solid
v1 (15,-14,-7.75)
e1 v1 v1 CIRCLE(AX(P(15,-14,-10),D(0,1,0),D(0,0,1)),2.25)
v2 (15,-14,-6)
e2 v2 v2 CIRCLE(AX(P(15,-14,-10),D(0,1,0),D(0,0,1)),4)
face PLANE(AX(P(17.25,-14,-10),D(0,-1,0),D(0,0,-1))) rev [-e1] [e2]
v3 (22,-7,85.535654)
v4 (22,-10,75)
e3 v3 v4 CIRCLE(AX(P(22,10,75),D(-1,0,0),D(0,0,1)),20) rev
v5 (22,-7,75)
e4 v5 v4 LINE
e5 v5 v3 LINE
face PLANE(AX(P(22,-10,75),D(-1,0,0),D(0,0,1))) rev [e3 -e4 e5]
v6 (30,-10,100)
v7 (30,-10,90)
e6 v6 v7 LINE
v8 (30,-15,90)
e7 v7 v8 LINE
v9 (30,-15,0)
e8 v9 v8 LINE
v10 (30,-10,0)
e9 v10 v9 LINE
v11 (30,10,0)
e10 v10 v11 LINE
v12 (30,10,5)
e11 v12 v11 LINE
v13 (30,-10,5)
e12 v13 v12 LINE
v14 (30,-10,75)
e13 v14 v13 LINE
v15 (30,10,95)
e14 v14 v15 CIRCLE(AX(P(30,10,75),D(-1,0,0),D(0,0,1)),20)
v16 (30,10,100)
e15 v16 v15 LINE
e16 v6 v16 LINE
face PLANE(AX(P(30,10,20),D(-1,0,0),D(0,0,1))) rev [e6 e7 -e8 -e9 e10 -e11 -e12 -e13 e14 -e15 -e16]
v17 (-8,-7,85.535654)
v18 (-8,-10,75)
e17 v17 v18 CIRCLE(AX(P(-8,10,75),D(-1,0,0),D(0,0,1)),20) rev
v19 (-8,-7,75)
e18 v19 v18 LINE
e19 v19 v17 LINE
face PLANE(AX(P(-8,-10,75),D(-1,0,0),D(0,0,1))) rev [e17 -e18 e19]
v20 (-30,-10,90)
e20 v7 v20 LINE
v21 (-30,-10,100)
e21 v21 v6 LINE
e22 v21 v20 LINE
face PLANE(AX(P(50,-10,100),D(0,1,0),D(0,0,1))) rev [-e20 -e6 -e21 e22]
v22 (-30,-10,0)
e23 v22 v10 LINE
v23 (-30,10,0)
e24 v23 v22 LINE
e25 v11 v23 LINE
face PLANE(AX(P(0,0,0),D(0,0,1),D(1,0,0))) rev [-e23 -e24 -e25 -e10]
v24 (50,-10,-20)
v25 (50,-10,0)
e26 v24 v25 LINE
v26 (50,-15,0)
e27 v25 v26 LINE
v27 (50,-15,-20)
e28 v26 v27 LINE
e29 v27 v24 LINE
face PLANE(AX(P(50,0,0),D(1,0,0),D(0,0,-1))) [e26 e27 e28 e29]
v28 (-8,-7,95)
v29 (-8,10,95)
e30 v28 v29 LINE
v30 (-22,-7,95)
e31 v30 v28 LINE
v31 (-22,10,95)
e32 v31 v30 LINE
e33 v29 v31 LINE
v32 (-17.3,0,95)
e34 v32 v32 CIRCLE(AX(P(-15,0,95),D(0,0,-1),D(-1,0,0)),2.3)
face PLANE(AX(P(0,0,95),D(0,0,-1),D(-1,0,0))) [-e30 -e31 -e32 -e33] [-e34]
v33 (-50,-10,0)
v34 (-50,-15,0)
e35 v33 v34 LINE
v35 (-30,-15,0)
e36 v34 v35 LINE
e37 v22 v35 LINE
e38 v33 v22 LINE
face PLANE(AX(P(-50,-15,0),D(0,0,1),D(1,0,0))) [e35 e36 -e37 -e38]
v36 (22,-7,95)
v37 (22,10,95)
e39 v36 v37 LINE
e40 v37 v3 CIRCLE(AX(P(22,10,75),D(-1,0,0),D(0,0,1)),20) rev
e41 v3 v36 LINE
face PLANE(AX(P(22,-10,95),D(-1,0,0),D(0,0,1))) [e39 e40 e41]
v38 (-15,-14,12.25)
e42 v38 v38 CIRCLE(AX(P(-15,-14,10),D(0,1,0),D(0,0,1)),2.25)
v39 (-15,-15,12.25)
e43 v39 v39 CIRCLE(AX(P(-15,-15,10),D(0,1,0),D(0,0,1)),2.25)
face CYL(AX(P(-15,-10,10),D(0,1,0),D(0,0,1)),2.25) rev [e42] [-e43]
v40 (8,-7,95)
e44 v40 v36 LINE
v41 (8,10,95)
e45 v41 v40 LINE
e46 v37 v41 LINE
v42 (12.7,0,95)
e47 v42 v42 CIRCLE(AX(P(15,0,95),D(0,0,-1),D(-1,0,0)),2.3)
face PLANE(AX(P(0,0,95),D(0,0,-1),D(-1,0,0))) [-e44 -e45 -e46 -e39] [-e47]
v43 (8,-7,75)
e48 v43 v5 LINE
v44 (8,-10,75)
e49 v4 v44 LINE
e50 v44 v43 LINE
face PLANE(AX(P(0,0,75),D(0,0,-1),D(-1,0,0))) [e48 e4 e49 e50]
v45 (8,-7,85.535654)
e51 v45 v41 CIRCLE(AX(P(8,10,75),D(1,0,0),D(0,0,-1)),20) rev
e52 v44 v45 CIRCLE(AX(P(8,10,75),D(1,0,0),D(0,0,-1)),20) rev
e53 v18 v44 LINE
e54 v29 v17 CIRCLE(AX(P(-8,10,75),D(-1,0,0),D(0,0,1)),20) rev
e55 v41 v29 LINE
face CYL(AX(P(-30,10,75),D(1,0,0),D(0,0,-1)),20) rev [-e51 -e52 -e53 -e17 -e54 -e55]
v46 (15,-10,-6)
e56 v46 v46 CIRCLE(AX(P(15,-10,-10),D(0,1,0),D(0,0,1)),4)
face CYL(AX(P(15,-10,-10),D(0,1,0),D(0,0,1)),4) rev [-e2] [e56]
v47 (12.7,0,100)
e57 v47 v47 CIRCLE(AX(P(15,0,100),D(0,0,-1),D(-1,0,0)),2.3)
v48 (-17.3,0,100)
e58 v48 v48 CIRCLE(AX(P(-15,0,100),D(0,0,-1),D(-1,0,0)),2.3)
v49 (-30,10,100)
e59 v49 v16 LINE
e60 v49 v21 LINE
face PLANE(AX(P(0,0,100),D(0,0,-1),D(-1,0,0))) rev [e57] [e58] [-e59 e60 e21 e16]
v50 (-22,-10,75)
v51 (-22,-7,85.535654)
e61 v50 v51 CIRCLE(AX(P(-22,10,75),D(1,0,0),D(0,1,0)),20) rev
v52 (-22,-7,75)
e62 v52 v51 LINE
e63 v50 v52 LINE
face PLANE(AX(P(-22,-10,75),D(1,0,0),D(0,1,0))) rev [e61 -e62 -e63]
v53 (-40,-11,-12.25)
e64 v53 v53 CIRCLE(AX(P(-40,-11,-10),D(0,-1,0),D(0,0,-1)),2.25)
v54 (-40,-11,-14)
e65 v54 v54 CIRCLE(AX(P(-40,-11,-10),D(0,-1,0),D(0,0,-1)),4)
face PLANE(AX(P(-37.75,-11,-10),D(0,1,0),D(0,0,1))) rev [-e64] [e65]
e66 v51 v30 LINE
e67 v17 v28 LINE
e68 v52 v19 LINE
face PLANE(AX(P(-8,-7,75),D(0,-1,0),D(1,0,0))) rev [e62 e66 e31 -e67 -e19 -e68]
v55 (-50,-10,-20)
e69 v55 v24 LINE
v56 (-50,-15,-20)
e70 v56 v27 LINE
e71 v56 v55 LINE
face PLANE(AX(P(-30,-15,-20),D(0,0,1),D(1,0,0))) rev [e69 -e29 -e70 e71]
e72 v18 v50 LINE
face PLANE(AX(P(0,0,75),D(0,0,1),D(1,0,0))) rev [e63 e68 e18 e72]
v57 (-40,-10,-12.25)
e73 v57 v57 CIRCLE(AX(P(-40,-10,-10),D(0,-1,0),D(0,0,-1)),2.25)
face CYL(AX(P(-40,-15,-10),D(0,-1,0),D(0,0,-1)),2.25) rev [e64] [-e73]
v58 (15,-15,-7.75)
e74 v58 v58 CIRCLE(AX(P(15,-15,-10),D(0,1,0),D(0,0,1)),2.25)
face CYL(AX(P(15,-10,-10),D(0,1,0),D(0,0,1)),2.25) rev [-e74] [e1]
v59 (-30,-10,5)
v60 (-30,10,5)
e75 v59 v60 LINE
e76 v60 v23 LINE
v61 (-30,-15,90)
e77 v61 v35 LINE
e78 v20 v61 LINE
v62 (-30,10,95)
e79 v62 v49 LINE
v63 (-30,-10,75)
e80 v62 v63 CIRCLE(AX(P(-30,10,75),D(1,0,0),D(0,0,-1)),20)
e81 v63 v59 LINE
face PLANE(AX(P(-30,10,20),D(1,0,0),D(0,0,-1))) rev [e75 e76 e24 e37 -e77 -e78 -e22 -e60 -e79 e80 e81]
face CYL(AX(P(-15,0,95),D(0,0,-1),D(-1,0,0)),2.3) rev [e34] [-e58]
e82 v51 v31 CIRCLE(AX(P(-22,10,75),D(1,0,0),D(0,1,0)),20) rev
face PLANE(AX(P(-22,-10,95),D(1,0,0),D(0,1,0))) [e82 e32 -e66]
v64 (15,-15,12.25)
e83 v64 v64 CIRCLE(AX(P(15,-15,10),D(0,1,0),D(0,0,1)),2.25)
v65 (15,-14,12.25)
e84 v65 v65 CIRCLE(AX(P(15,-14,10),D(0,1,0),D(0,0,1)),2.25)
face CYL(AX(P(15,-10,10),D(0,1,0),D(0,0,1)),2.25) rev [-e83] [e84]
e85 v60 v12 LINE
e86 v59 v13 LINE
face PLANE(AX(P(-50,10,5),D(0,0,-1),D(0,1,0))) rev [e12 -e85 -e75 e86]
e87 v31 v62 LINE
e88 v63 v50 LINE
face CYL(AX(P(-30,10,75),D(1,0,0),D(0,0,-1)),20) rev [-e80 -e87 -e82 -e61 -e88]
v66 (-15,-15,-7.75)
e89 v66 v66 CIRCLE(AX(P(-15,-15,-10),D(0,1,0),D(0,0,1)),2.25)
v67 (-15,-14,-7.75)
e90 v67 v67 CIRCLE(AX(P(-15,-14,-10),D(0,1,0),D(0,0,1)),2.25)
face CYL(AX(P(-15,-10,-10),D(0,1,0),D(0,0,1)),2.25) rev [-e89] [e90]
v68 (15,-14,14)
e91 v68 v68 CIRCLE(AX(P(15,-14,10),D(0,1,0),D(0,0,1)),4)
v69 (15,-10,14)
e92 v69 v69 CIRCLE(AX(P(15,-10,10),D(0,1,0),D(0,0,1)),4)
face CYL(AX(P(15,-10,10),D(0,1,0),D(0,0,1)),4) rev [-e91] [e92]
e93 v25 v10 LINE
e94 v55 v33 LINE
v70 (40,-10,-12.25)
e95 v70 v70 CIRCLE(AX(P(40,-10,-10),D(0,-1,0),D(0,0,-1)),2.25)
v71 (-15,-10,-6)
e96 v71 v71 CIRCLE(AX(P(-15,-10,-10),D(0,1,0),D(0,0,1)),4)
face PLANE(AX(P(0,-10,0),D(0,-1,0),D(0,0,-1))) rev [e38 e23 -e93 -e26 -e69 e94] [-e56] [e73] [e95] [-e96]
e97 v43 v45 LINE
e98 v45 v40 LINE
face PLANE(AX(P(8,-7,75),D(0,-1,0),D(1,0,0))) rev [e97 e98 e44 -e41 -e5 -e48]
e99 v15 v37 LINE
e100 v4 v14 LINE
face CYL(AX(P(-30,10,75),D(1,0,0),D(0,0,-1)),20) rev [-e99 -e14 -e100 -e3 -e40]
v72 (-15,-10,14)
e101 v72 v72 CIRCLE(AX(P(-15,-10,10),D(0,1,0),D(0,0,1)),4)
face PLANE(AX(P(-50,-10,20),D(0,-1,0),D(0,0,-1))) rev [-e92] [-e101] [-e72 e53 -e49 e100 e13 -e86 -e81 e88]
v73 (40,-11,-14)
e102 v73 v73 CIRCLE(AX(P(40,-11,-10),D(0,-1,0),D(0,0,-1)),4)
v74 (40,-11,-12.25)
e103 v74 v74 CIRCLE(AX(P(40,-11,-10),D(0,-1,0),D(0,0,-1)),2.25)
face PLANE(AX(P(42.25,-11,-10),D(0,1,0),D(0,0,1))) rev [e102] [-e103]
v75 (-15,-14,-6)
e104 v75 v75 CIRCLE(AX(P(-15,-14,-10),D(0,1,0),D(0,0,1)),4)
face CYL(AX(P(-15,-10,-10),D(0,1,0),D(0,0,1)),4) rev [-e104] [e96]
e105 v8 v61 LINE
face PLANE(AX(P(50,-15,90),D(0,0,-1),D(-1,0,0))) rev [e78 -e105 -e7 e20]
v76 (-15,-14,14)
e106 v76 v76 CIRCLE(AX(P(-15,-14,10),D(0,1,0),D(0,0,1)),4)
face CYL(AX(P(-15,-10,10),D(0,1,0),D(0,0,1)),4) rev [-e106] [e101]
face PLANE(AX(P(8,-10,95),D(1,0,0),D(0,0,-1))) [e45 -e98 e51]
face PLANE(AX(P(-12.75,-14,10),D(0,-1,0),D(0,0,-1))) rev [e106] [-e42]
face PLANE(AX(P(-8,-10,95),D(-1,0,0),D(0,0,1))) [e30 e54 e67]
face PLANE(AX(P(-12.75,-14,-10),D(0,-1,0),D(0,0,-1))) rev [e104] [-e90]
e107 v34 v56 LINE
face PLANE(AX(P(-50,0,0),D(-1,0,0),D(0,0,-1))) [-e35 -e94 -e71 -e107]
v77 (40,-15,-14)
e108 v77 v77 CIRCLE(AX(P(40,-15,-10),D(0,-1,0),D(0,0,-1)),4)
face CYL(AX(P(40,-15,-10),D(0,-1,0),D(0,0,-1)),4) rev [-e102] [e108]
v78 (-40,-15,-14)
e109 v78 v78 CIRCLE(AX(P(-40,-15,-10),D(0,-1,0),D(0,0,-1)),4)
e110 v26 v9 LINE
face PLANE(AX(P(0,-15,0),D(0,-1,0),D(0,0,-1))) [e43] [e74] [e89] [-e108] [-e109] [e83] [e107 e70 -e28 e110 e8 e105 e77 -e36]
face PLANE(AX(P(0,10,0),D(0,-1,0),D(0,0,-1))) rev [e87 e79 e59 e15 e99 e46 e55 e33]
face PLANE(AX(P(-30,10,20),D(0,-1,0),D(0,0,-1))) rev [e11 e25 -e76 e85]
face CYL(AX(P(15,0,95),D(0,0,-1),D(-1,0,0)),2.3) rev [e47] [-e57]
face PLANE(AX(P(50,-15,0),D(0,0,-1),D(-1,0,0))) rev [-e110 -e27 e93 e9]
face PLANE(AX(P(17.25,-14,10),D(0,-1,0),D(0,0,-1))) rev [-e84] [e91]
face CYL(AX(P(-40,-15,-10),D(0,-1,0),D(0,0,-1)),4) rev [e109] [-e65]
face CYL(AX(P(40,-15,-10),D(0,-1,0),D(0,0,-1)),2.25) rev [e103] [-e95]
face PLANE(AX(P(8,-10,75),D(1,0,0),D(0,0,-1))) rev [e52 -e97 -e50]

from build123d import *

# Parameters (mm, degrees)
SKETCH_1_W                   = 60
SKETCH_1_H                   = 20
EXTRUDE_1_DEPTH              = 20
SKETCH_2_W                   = 60
SKETCH_2_H                   = 40
EXTRUDE_2_DEPTH              = 5
SKETCH_3_W                   = 20
SKETCH_3_H                   = 5
EXTRUDE_3_DEPTH              = 20
HOLE_WIZARD_M4_2_D           = 4.5
HOLE_WIZARD_M4_2_CBORE_D     = 8
HOLE_WIZARD_M4_2_CBORE_DEPTH = 4
SKETCH_8_W                   = 15
SKETCH_8_H                   = 20
CUT_EXTRUDE_1_DEPTH          = 84.815273071
HOLE_WIZARD_M4_1_D           = 4.5
HOLE_WIZARD_M4_1_CBORE_D     = 8
HOLE_WIZARD_M4_1_CBORE_DEPTH = 4
SKETCH_10_W                  = 60
SKETCH_10_H                  = 5
EXTRUDE_4_DEPTH              = 80
SKETCH_11_W                  = 60
SKETCH_11_H                  = 5
EXTRUDE_5_DEPTH              = 20
FILLET_1_R                   = 20
SKETCH_12_W                  = 10
SKETCH_12_H                  = 5
CUT_EXTRUDE_2_DEPTH          = 129.937969582
SKETCH_13_W                  = 14
SKETCH_13_H                  = 20
CUT_EXTRUDE_3_DEPTH          = 35
SKETCH_14_W                  = 14
SKETCH_14_H                  = 3
EXTRUDE_6_DEPTH              = 20
HOLE_WIZARD_M4_1_2_D         = 4.6
HOLE_WIZARD_M4_1_2_DEPTH     = 5


with BuildPart() as part:
    # 스케치1 → 보스-돌출1 (new body)
    with BuildSketch(Plane.XY):
        Rectangle(SKETCH_1_W, SKETCH_1_H)
    extrude(amount=EXTRUDE_1_DEPTH)

    # 스케치2 → 보스-돌출2 (add)
    with BuildSketch(Plane.XZ.offset(10)):
        Rectangle(SKETCH_2_W, SKETCH_2_H)
    extrude(amount=EXTRUDE_2_DEPTH)

    # 스케치3 → 보스-돌출3 (add)
    with BuildSketch(Plane(origin=(30, 0, 0), x_dir=(0, 0, -1), z_dir=(1, 0, 0))):
        with Locations((10, -12.5)):
            Rectangle(SKETCH_3_W, SKETCH_3_H)
    extrude_3 = extrude(amount=EXTRUDE_3_DEPTH)

    # 대칭 복사1: 보스-돌출3 across plane
    add(extrude_3.mirror(Plane.ZY))

    # M4 소켓 머리 캡 나사용 카운터보어2 (through all)
    with Locations(Plane(origin=(0, -15, 0), x_dir=(-1, 0, 0), z_dir=(0, -1, 0))):
        with Locations((40, 10), (-40, 10)):
            CounterBoreHole(HOLE_WIZARD_M4_2_D / 2, HOLE_WIZARD_M4_2_CBORE_D / 2, HOLE_WIZARD_M4_2_CBORE_DEPTH)

    # 스케치8 → 컷-돌출1 (cut, through all)
    with BuildSketch(Plane(origin=(30, 0, 0), x_dir=(0, 0, -1), z_dir=(1, 0, 0))):
        with Locations((-12.5, 0)):
            Rectangle(SKETCH_8_W, SKETCH_8_H)
    extrude(amount=-CUT_EXTRUDE_1_DEPTH, mode=Mode.SUBTRACT)

    # Hole Wizard M4 _ _ _ _ _1 (through all)
    with Locations(Plane(origin=(0, -10, 0), x_dir=(1, 0, 0), z_dir=(0, 1, 0))):
        with Locations((-15, 10), (15, 10), (-15, -10), (15, -10)):
            CounterBoreHole(HOLE_WIZARD_M4_1_D / 2, HOLE_WIZARD_M4_1_CBORE_D / 2, HOLE_WIZARD_M4_1_CBORE_DEPTH)

    # 스케치10 → 보스-돌출4 (add)
    with BuildSketch(Plane.XY.offset(20)):
        with Locations((0, -12.5)):
            Rectangle(SKETCH_10_W, SKETCH_10_H)
    extrude(amount=EXTRUDE_4_DEPTH)

    # 스케치11 → 보스-돌출5 (add)
    with BuildSketch(Plane(origin=(0, -10, 0), x_dir=(1, 0, 0), z_dir=(0, 1, 0))):
        with Locations((0, -97.5)):
            Rectangle(SKETCH_11_W, SKETCH_11_H)
    extrude(amount=EXTRUDE_5_DEPTH)

    # 필렛1
    fillet_1_edges = [part.edges().sort_by_distance(p)[0] for p in [
        (0, -10, 95),
    ]]
    fillet(fillet_1_edges, radius=FILLET_1_R - 0.0001)  # a hair under: the kernel refuses the full size

    # 스케치12 → 컷-돌출2 (cut, through all)
    with BuildSketch(Plane.ZY.offset(30)):
        with Locations((95, -12.5)):
            Rectangle(SKETCH_12_W, SKETCH_12_H)
    extrude(amount=-CUT_EXTRUDE_2_DEPTH, mode=Mode.SUBTRACT)

    # 스케치13 → 컷-돌출3 (cut)
    with BuildSketch(Plane.XY.offset(60)):
        with Locations((-15, 0)):
            Rectangle(SKETCH_13_W, SKETCH_13_H)
        with Locations((15, 0)):
            Rectangle(SKETCH_13_W, SKETCH_13_H)
    extrude(amount=CUT_EXTRUDE_3_DEPTH, mode=Mode.SUBTRACT)

    # 스케치14 → 보스-돌출6 (add)
    with BuildSketch(Plane(origin=(0, 0, 95), x_dir=(-1, 0, 0), z_dir=(0, 0, -1))):
        with Locations((-15, -8.5)):
            Rectangle(SKETCH_14_W, SKETCH_14_H)
        with Locations((15, -8.5)):
            Rectangle(SKETCH_14_W, SKETCH_14_H)
    extrude(amount=EXTRUDE_6_DEPTH)

    # Hole Wizard M4 _ _1 2
    with Locations(Plane(origin=(0, 0, 95), x_dir=(-1, 0, 0), z_dir=(0, 0, -1))):
        with Locations((-15, 0), (15, 0)):
            Hole(HOLE_WIZARD_M4_1_2_D / 2, depth=HOLE_WIZARD_M4_1_2_DEPTH)


solid = part.part
